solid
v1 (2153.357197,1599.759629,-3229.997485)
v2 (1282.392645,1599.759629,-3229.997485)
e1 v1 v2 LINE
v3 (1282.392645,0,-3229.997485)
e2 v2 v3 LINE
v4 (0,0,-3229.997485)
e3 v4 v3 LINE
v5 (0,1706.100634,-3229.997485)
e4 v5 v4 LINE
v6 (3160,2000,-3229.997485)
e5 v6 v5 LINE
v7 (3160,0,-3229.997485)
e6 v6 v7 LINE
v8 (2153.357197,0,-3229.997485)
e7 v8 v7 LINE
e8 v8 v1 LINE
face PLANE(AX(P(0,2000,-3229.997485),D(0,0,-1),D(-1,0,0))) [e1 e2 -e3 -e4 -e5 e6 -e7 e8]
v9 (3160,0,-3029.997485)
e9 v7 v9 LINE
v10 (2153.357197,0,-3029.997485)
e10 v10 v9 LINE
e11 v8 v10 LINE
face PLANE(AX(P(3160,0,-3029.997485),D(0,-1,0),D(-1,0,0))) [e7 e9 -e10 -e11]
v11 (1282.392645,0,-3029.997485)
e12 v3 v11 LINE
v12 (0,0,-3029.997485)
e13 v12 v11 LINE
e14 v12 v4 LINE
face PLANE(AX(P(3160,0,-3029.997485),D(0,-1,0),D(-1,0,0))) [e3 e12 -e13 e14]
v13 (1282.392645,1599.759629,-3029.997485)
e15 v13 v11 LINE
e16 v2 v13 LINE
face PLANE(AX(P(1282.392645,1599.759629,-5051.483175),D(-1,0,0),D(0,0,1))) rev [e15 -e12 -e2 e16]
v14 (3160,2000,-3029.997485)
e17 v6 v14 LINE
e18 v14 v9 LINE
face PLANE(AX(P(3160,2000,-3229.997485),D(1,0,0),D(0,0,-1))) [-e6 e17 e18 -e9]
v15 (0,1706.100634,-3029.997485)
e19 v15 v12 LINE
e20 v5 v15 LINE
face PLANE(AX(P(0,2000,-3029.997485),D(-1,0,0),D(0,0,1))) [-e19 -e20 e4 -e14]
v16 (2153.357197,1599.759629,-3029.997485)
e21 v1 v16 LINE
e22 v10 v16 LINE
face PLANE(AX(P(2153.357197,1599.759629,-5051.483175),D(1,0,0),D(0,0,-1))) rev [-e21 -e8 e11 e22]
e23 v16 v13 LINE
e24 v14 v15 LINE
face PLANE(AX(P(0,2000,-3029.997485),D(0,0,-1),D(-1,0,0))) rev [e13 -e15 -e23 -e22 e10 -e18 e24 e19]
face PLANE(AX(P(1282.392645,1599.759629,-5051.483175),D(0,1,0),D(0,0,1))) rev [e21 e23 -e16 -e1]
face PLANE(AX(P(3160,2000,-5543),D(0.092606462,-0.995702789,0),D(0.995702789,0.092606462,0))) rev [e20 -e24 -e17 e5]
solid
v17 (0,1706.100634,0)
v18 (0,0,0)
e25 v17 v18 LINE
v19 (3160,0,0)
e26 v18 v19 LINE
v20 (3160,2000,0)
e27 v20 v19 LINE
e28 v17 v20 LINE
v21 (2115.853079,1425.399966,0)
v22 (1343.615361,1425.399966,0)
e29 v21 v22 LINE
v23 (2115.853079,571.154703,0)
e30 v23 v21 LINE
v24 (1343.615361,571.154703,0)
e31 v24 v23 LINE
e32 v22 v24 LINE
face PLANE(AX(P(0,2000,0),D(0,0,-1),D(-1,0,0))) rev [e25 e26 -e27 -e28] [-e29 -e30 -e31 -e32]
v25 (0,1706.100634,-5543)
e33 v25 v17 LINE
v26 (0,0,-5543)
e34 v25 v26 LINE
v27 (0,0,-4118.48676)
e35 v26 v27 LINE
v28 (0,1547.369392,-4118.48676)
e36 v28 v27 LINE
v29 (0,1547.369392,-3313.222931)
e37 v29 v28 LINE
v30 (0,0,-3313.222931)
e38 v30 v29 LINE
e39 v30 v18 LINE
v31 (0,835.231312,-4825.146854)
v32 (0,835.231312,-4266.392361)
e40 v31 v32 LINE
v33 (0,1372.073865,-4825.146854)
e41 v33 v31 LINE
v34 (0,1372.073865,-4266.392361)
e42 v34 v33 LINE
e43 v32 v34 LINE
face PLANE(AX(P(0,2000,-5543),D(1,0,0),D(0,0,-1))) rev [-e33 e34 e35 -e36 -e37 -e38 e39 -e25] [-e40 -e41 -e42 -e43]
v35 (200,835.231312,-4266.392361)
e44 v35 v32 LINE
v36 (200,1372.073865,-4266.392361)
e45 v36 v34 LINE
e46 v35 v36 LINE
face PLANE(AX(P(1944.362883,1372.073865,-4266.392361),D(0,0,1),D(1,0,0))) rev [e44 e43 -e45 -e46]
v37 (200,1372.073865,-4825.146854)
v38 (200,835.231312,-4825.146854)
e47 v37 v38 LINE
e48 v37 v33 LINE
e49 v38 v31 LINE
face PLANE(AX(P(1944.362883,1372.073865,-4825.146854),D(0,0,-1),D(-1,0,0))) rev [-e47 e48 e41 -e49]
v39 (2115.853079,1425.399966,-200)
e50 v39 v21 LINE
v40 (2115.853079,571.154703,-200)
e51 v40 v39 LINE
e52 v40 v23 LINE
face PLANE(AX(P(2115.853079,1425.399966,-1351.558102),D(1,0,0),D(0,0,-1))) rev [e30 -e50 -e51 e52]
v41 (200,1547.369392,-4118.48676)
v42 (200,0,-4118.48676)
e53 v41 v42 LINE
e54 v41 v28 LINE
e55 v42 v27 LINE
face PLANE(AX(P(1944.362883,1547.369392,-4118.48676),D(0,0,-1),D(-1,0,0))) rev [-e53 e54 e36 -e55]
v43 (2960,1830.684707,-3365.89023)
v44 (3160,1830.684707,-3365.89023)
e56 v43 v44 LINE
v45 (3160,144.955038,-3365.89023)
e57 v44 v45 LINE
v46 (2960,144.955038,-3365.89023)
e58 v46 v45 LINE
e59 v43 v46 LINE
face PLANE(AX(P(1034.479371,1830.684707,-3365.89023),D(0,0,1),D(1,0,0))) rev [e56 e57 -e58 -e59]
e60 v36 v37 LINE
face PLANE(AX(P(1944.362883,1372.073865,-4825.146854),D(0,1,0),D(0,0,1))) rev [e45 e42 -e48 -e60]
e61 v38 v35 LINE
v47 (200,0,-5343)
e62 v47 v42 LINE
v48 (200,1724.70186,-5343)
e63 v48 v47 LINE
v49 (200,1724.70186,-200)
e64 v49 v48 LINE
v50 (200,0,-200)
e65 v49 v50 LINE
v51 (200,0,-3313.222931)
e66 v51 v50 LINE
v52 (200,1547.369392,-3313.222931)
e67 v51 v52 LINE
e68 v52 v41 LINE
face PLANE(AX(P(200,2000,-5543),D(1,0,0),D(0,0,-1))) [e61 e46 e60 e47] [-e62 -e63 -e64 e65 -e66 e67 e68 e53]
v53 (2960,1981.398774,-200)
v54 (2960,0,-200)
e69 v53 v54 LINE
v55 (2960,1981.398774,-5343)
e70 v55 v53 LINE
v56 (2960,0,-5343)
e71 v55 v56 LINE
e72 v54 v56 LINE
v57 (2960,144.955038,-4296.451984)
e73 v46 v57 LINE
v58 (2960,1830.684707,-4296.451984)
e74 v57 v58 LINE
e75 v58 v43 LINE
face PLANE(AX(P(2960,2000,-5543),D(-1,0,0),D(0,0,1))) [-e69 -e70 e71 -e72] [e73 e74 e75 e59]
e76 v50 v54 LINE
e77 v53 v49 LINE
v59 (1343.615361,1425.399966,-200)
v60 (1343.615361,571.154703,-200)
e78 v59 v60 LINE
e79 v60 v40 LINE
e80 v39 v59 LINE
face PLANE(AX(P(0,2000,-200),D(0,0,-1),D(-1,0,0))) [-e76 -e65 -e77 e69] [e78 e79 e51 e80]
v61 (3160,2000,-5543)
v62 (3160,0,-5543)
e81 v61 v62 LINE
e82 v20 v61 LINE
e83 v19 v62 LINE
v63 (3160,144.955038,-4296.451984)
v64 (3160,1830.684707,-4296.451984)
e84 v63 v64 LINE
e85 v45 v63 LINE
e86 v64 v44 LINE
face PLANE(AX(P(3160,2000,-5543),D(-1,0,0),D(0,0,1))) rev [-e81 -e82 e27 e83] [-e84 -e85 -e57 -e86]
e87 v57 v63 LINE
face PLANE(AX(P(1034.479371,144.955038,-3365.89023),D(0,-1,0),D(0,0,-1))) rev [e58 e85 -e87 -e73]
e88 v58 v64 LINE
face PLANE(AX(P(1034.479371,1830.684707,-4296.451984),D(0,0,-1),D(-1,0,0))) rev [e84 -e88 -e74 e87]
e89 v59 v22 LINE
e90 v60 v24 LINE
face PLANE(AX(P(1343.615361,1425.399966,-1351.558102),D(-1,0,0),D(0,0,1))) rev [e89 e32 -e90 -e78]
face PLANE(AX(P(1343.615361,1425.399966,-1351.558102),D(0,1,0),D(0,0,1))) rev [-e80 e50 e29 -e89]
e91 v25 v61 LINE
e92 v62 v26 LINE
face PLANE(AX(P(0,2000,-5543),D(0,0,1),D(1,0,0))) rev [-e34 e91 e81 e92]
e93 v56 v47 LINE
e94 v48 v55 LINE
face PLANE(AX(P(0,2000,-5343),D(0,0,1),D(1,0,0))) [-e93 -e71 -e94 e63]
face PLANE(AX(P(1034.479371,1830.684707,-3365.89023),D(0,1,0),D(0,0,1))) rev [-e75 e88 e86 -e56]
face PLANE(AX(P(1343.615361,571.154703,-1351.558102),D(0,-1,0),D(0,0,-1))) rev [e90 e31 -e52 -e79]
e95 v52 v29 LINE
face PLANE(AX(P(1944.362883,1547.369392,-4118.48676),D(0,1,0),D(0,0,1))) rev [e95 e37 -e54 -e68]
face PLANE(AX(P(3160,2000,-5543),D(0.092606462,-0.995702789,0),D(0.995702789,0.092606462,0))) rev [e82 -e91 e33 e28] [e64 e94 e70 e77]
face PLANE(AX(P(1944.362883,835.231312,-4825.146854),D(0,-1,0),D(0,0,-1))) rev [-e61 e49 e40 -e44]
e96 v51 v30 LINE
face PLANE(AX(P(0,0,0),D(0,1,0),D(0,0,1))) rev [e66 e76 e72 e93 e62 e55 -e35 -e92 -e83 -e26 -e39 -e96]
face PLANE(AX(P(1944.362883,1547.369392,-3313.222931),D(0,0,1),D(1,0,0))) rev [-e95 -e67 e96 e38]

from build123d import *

# Parameters (mm, degrees)
EXTRUDE_1_OUTLINE_W   = 3160
EXTRUDE_1_OUTLINE_H   = 5543
EXTRUDE_1_OUTLINE_W_2 = 2760
EXTRUDE_1_OUTLINE_H_2 = 5143
EXTRUDE_1_DEPTH       = 2000
EXTRUDE_1_2_OUTLINE_W = 3160
EXTRUDE_1_2_OUTLINE_H = 200
EXTRUDE_1_2_DEPTH     = 2000
CUT_EXTRUDE_1_DEPTH   = 6687.587246122
SKETCH_3_W            = 558.75449328
SKETCH_3_H            = 536.842552368
SKETCH_3_W_2          = 805.263828551
SKETCH_3_H_2          = 1547.369391924
CUT_EXTRUDE_2_DEPTH   = 200
SKETCH_4_W            = 772.237717919
SKETCH_4_H            = 854.245263185
CUT_EXTRUDE_3_DEPTH   = 200
SKETCH_5_W            = 870.964551477
SKETCH_5_H            = 1599.759628709
CUT_EXTRUDE_4_DEPTH   = 200
SKETCH_6_W            = 930.561753535
SKETCH_6_H            = 1685.729668706
CUT_EXTRUDE_5_DEPTH   = 200


# Read off the part's stored shape, not the designer's step: Вытянуть-Тонкостенный1
with BuildPart() as part:
    # Вытянуть-Тонкостенный1 outline → Вытянуть-Тонкостенный1 (new body)
    with BuildSketch(Plane(origin=(0, 0, 0), x_dir=(1, 0, 0), z_dir=(0, 1, 0))):
        with Locations((1580, 2771.5)):
            Rectangle(EXTRUDE_1_OUTLINE_W, EXTRUDE_1_OUTLINE_H)
        with Locations((1580, 2771.5)):
            Rectangle(EXTRUDE_1_OUTLINE_W_2, EXTRUDE_1_OUTLINE_H_2, mode=Mode.SUBTRACT)
    extrude(amount=EXTRUDE_1_DEPTH)


with BuildPart() as body_2:
    # Extrude 1 2 outline → Extrude 1 2 (new body)
    with BuildSketch(Plane(origin=(0, 0, 0), x_dir=(1, 0, 0), z_dir=(0, 1, 0))):
        with Locations((1580, 3129.997484617)):
            Rectangle(EXTRUDE_1_2_OUTLINE_W, EXTRUDE_1_2_OUTLINE_H)
    extrude(amount=EXTRUDE_1_2_DEPTH)


with BuildPart() as cut_extrude_1_tool:
    # Эскиз2 → Вырез-Вытянуть1 (new, through all)
    with BuildSketch(Plane.XY):
        Polygon((0, 2000), (3160, 2000), (0, 1706.10063383), align=None)
    extrude(amount=-CUT_EXTRUDE_1_DEPTH)


with BuildPart() as part_1:
    add(part.part)

    # Вырез-Вытянуть1: cut by cut_extrude_1_tool
    add(cut_extrude_1_tool.part, mode=Mode.SUBTRACT)

    # Эскиз3 → Вырез-Вытянуть2 (cut)
    with BuildSketch(Plane.ZY):
        with Locations((-4545.769607678, 1103.652588436)):
            Rectangle(SKETCH_3_W, SKETCH_3_H)
        with Locations((-3715.8548456, 773.684695962)):
            Rectangle(SKETCH_3_W_2, SKETCH_3_H_2)
    extrude(amount=-CUT_EXTRUDE_2_DEPTH, mode=Mode.SUBTRACT)

    # Эскиз4 → Вырез-Вытянуть3 (cut)
    with BuildSketch(Plane.XY):
        with Locations((1729.734220459, 998.277334586)):
            Rectangle(SKETCH_4_W, SKETCH_4_H)
    extrude(amount=-CUT_EXTRUDE_3_DEPTH, mode=Mode.SUBTRACT)

    # Эскиз6 → Вырез-Вытянуть5 (cut)
    with BuildSketch(Plane(origin=(3160, 0, 0), x_dir=(0, 0, -1), z_dir=(1, 0, 0))):
        with Locations((3831.171106774, 987.819872336)):
            Rectangle(SKETCH_6_W, SKETCH_6_H)
    extrude(amount=-CUT_EXTRUDE_5_DEPTH, mode=Mode.SUBTRACT)


with BuildPart() as body_2_1:
    add(body_2.part)

    # Вырез-Вытянуть1: cut by cut_extrude_1_tool
    add(cut_extrude_1_tool.part, mode=Mode.SUBTRACT)

    # Эскиз5 → Вырез-Вытянуть4 (cut)
    with BuildSketch(Plane.XY.offset(-3029.997484617)):
        with Locations((1717.874921169, 799.879814355)):
            Rectangle(SKETCH_5_W, SKETCH_5_H)
    extrude(amount=-CUT_EXTRUDE_4_DEPTH, mode=Mode.SUBTRACT)


solid = Compound([part_1.part, body_2_1.part])
